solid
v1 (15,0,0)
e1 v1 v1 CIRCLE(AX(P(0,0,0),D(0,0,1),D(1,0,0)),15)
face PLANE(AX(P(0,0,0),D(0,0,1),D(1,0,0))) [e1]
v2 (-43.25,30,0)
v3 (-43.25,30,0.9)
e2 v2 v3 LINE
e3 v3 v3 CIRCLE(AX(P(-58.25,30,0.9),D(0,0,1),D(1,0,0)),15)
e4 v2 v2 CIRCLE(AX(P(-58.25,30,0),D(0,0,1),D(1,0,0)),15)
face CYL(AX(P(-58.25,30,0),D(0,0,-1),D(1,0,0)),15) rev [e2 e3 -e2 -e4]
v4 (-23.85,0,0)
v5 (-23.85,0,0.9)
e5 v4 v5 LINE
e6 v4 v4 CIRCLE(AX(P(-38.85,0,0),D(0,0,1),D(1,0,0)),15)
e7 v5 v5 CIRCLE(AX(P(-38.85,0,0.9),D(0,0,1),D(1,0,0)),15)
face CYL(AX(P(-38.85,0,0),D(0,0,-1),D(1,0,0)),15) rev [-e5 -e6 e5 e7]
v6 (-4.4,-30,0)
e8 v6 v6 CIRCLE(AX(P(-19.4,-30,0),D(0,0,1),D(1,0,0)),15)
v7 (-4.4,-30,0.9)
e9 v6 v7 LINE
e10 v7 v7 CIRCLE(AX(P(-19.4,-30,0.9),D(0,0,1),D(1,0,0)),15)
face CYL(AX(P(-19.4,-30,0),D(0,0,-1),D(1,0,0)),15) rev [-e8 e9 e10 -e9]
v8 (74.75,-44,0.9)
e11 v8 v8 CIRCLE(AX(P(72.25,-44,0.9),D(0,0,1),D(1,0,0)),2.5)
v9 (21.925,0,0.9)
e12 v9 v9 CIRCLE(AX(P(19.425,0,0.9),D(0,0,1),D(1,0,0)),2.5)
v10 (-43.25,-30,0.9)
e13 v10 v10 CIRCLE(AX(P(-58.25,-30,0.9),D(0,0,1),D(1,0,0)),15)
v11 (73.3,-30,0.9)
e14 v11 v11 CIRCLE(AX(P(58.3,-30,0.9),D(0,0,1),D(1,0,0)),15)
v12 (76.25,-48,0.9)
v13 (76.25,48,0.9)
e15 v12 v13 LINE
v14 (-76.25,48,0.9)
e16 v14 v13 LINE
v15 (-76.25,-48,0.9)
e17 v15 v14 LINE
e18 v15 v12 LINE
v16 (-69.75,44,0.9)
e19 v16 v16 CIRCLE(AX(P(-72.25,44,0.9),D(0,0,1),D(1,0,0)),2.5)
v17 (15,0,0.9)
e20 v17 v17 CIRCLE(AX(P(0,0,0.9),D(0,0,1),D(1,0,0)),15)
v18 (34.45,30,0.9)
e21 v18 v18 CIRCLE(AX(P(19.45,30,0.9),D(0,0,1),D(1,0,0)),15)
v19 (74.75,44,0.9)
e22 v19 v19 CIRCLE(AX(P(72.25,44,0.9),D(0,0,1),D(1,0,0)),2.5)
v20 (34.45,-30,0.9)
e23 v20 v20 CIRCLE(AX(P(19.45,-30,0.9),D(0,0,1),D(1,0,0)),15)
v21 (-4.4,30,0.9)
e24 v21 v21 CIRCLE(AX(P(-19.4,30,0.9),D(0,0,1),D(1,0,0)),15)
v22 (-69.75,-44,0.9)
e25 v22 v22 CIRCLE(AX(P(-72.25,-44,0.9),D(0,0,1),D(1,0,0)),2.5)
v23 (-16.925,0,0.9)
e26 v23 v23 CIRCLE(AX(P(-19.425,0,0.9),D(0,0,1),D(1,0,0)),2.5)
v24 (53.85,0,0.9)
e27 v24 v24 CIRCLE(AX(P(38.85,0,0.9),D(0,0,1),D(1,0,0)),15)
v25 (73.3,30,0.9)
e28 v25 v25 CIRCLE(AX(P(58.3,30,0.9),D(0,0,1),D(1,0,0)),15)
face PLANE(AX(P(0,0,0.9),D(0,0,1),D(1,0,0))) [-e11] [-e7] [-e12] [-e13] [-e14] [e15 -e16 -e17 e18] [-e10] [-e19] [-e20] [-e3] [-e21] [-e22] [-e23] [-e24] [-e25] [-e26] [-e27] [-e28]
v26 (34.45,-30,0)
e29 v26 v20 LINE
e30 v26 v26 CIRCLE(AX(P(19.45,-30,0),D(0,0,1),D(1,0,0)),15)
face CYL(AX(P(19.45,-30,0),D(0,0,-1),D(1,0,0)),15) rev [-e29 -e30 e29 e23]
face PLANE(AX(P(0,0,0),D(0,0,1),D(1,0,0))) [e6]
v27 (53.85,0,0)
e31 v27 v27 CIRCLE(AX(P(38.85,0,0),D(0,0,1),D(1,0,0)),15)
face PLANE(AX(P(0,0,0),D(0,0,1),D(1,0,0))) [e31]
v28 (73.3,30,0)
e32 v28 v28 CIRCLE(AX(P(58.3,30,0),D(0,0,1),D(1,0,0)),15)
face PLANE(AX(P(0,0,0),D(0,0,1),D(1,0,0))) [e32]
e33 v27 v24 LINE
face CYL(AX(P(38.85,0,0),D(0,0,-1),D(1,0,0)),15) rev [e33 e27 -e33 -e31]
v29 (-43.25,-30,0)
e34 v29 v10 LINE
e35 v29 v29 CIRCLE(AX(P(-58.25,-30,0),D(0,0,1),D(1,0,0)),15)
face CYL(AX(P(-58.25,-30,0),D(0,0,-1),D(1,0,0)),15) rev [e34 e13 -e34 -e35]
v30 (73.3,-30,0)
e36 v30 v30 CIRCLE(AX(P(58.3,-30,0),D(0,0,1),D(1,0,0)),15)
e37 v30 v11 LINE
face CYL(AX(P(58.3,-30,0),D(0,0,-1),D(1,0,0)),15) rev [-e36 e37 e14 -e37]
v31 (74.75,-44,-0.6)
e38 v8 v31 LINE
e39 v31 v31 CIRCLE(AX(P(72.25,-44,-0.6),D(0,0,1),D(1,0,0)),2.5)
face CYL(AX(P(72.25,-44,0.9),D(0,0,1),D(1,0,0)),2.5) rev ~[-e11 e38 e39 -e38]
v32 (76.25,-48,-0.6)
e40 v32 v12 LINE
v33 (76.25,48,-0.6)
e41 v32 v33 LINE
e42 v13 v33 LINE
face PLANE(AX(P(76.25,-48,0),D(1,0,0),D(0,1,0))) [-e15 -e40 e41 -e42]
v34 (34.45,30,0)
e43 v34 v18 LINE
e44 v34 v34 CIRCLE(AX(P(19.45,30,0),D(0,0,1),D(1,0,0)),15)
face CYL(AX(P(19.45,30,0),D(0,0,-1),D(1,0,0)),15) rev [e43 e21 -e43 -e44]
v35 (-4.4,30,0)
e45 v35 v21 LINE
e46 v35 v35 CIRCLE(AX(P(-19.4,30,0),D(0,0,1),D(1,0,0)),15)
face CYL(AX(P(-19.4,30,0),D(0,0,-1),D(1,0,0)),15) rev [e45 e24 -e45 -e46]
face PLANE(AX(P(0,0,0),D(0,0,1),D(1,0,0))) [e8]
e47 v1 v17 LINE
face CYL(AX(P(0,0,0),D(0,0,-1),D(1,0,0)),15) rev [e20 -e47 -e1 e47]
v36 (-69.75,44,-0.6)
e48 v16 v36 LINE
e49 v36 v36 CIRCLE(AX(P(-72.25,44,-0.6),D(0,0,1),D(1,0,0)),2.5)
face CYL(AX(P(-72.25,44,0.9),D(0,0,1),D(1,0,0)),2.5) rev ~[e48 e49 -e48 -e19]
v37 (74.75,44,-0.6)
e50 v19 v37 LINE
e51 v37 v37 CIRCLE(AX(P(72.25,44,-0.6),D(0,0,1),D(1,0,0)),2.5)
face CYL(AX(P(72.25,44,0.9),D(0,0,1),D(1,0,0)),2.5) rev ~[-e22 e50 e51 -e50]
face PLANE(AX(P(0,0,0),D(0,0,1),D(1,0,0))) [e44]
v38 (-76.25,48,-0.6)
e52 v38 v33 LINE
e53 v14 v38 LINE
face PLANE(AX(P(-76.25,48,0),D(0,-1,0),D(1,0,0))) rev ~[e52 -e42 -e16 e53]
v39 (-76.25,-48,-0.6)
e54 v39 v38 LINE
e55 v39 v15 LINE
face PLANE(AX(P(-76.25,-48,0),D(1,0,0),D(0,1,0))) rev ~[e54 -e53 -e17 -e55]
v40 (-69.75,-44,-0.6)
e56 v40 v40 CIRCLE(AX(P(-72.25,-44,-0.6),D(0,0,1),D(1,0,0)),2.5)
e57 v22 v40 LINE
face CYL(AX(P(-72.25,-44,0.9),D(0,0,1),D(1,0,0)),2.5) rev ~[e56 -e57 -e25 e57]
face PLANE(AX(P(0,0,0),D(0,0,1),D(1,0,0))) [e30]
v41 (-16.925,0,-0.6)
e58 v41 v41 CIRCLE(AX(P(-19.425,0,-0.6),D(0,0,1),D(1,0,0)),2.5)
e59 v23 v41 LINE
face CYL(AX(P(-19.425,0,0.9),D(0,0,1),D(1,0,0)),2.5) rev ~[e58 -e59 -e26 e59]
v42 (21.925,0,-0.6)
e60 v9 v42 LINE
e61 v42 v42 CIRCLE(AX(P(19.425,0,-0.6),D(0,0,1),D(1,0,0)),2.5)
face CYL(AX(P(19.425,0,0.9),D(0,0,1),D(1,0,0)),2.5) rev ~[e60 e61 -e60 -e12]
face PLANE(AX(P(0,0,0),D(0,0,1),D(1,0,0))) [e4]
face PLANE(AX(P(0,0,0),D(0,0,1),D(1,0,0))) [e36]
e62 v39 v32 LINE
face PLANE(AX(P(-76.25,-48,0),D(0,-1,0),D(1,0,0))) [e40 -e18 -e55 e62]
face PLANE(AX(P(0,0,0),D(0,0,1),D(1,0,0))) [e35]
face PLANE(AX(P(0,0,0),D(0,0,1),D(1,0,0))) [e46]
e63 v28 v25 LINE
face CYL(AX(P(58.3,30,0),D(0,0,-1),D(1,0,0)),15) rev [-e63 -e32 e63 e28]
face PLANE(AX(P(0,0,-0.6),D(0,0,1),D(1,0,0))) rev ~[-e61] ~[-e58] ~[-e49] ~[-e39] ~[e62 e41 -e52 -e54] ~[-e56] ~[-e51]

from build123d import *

# Parameters (mm, degrees)
F0_W     = 152.5
F0_H     = 96
F0_R     = 15
F1_DEPTH = 0.9
F2_DEPTH = 0.6
F3_R     = 2.5
F4_DEPTH = 1.501


# Not quite as in the source:
# - a feature names something its author has since deleted; it is built from what else it names


with BuildPart() as f1:
    # F0 (on Top) → F1 (new body)
    with BuildSketch(Plane.XY):
        Rectangle(F0_W, F0_H)
        with Locations((-58.25, -30)):
            Circle(F0_R, mode=Mode.SUBTRACT)
        with Locations((-19.4, -30)):
            Circle(F0_R, mode=Mode.SUBTRACT)
        with Locations((19.45, -30)):
            Circle(F0_R, mode=Mode.SUBTRACT)
        with Locations((58.3, -30)):
            Circle(F0_R, mode=Mode.SUBTRACT)
        with Locations((-38.85, 0)):
            Circle(F0_R, mode=Mode.SUBTRACT)
        with Locations((-58.25, 30)):
            Circle(F0_R, mode=Mode.SUBTRACT)
        with Locations((-19.4, 30)):
            Circle(F0_R, mode=Mode.SUBTRACT)
        Circle(F0_R, mode=Mode.SUBTRACT)
        with Locations((38.85, 0)):
            Circle(F0_R, mode=Mode.SUBTRACT)
        with Locations((19.45, 30)):
            Circle(F0_R, mode=Mode.SUBTRACT)
        with Locations((58.3, 30)):
            Circle(F0_R, mode=Mode.SUBTRACT)
    extrude(amount=F1_DEPTH)

    # F0 (on Top) → F2 (join)
    with BuildSketch(Plane.XY):
        Rectangle(F0_W, F0_H)
        with Locations((-58.25, -30)):
            Circle(F0_R, mode=Mode.SUBTRACT)
        with Locations((-19.4, -30)):
            Circle(F0_R, mode=Mode.SUBTRACT)
        with Locations((19.45, -30)):
            Circle(F0_R, mode=Mode.SUBTRACT)
        with Locations((58.3, -30)):
            Circle(F0_R, mode=Mode.SUBTRACT)
        with Locations((-38.85, 0)):
            Circle(F0_R, mode=Mode.SUBTRACT)
        with Locations((-58.25, 30)):
            Circle(F0_R, mode=Mode.SUBTRACT)
        with Locations((-19.4, 30)):
            Circle(F0_R, mode=Mode.SUBTRACT)
        Circle(F0_R, mode=Mode.SUBTRACT)
        with Locations((38.85, 0)):
            Circle(F0_R, mode=Mode.SUBTRACT)
        with Locations((19.45, 30)):
            Circle(F0_R, mode=Mode.SUBTRACT)
        with Locations((58.3, 30)):
            Circle(F0_R, mode=Mode.SUBTRACT)
        with Locations((-58.25, -30)):
            Circle(F0_R)
        with Locations((-38.85, 0)):
            Circle(F0_R)
        with Locations((-58.25, 30)):
            Circle(F0_R)
        with Locations((-19.4, 30)):
            Circle(F0_R)
        with Locations((19.45, 30)):
            Circle(F0_R)
        Circle(F0_R)
        with Locations((38.85, 0)):
            Circle(F0_R)
        with Locations((19.45, -30)):
            Circle(F0_R)
        with Locations((58.3, -30)):
            Circle(F0_R)
        with Locations((58.3, 30)):
            Circle(F0_R)
        with Locations((-19.4, -30)):
            Circle(F0_R)
    extrude(amount=-F2_DEPTH)

    # F3 (on face) → F4 (cut, through all)
    with BuildSketch(Plane.XY.offset(0.9)):
        with Locations((-72.25, 44)):
            Circle(F3_R)
        with Locations((72.25, 44)):
            Circle(F3_R)
        with Locations((-72.25, -44)):
            Circle(F3_R)
        with Locations((72.25, -44)):
            Circle(F3_R)
        with Locations((-19.425, 0)):
            Circle(F3_R)
        with Locations((19.425, 0)):
            Circle(F3_R)
    extrude(amount=-F4_DEPTH, mode=Mode.SUBTRACT)


solid = f1.part
